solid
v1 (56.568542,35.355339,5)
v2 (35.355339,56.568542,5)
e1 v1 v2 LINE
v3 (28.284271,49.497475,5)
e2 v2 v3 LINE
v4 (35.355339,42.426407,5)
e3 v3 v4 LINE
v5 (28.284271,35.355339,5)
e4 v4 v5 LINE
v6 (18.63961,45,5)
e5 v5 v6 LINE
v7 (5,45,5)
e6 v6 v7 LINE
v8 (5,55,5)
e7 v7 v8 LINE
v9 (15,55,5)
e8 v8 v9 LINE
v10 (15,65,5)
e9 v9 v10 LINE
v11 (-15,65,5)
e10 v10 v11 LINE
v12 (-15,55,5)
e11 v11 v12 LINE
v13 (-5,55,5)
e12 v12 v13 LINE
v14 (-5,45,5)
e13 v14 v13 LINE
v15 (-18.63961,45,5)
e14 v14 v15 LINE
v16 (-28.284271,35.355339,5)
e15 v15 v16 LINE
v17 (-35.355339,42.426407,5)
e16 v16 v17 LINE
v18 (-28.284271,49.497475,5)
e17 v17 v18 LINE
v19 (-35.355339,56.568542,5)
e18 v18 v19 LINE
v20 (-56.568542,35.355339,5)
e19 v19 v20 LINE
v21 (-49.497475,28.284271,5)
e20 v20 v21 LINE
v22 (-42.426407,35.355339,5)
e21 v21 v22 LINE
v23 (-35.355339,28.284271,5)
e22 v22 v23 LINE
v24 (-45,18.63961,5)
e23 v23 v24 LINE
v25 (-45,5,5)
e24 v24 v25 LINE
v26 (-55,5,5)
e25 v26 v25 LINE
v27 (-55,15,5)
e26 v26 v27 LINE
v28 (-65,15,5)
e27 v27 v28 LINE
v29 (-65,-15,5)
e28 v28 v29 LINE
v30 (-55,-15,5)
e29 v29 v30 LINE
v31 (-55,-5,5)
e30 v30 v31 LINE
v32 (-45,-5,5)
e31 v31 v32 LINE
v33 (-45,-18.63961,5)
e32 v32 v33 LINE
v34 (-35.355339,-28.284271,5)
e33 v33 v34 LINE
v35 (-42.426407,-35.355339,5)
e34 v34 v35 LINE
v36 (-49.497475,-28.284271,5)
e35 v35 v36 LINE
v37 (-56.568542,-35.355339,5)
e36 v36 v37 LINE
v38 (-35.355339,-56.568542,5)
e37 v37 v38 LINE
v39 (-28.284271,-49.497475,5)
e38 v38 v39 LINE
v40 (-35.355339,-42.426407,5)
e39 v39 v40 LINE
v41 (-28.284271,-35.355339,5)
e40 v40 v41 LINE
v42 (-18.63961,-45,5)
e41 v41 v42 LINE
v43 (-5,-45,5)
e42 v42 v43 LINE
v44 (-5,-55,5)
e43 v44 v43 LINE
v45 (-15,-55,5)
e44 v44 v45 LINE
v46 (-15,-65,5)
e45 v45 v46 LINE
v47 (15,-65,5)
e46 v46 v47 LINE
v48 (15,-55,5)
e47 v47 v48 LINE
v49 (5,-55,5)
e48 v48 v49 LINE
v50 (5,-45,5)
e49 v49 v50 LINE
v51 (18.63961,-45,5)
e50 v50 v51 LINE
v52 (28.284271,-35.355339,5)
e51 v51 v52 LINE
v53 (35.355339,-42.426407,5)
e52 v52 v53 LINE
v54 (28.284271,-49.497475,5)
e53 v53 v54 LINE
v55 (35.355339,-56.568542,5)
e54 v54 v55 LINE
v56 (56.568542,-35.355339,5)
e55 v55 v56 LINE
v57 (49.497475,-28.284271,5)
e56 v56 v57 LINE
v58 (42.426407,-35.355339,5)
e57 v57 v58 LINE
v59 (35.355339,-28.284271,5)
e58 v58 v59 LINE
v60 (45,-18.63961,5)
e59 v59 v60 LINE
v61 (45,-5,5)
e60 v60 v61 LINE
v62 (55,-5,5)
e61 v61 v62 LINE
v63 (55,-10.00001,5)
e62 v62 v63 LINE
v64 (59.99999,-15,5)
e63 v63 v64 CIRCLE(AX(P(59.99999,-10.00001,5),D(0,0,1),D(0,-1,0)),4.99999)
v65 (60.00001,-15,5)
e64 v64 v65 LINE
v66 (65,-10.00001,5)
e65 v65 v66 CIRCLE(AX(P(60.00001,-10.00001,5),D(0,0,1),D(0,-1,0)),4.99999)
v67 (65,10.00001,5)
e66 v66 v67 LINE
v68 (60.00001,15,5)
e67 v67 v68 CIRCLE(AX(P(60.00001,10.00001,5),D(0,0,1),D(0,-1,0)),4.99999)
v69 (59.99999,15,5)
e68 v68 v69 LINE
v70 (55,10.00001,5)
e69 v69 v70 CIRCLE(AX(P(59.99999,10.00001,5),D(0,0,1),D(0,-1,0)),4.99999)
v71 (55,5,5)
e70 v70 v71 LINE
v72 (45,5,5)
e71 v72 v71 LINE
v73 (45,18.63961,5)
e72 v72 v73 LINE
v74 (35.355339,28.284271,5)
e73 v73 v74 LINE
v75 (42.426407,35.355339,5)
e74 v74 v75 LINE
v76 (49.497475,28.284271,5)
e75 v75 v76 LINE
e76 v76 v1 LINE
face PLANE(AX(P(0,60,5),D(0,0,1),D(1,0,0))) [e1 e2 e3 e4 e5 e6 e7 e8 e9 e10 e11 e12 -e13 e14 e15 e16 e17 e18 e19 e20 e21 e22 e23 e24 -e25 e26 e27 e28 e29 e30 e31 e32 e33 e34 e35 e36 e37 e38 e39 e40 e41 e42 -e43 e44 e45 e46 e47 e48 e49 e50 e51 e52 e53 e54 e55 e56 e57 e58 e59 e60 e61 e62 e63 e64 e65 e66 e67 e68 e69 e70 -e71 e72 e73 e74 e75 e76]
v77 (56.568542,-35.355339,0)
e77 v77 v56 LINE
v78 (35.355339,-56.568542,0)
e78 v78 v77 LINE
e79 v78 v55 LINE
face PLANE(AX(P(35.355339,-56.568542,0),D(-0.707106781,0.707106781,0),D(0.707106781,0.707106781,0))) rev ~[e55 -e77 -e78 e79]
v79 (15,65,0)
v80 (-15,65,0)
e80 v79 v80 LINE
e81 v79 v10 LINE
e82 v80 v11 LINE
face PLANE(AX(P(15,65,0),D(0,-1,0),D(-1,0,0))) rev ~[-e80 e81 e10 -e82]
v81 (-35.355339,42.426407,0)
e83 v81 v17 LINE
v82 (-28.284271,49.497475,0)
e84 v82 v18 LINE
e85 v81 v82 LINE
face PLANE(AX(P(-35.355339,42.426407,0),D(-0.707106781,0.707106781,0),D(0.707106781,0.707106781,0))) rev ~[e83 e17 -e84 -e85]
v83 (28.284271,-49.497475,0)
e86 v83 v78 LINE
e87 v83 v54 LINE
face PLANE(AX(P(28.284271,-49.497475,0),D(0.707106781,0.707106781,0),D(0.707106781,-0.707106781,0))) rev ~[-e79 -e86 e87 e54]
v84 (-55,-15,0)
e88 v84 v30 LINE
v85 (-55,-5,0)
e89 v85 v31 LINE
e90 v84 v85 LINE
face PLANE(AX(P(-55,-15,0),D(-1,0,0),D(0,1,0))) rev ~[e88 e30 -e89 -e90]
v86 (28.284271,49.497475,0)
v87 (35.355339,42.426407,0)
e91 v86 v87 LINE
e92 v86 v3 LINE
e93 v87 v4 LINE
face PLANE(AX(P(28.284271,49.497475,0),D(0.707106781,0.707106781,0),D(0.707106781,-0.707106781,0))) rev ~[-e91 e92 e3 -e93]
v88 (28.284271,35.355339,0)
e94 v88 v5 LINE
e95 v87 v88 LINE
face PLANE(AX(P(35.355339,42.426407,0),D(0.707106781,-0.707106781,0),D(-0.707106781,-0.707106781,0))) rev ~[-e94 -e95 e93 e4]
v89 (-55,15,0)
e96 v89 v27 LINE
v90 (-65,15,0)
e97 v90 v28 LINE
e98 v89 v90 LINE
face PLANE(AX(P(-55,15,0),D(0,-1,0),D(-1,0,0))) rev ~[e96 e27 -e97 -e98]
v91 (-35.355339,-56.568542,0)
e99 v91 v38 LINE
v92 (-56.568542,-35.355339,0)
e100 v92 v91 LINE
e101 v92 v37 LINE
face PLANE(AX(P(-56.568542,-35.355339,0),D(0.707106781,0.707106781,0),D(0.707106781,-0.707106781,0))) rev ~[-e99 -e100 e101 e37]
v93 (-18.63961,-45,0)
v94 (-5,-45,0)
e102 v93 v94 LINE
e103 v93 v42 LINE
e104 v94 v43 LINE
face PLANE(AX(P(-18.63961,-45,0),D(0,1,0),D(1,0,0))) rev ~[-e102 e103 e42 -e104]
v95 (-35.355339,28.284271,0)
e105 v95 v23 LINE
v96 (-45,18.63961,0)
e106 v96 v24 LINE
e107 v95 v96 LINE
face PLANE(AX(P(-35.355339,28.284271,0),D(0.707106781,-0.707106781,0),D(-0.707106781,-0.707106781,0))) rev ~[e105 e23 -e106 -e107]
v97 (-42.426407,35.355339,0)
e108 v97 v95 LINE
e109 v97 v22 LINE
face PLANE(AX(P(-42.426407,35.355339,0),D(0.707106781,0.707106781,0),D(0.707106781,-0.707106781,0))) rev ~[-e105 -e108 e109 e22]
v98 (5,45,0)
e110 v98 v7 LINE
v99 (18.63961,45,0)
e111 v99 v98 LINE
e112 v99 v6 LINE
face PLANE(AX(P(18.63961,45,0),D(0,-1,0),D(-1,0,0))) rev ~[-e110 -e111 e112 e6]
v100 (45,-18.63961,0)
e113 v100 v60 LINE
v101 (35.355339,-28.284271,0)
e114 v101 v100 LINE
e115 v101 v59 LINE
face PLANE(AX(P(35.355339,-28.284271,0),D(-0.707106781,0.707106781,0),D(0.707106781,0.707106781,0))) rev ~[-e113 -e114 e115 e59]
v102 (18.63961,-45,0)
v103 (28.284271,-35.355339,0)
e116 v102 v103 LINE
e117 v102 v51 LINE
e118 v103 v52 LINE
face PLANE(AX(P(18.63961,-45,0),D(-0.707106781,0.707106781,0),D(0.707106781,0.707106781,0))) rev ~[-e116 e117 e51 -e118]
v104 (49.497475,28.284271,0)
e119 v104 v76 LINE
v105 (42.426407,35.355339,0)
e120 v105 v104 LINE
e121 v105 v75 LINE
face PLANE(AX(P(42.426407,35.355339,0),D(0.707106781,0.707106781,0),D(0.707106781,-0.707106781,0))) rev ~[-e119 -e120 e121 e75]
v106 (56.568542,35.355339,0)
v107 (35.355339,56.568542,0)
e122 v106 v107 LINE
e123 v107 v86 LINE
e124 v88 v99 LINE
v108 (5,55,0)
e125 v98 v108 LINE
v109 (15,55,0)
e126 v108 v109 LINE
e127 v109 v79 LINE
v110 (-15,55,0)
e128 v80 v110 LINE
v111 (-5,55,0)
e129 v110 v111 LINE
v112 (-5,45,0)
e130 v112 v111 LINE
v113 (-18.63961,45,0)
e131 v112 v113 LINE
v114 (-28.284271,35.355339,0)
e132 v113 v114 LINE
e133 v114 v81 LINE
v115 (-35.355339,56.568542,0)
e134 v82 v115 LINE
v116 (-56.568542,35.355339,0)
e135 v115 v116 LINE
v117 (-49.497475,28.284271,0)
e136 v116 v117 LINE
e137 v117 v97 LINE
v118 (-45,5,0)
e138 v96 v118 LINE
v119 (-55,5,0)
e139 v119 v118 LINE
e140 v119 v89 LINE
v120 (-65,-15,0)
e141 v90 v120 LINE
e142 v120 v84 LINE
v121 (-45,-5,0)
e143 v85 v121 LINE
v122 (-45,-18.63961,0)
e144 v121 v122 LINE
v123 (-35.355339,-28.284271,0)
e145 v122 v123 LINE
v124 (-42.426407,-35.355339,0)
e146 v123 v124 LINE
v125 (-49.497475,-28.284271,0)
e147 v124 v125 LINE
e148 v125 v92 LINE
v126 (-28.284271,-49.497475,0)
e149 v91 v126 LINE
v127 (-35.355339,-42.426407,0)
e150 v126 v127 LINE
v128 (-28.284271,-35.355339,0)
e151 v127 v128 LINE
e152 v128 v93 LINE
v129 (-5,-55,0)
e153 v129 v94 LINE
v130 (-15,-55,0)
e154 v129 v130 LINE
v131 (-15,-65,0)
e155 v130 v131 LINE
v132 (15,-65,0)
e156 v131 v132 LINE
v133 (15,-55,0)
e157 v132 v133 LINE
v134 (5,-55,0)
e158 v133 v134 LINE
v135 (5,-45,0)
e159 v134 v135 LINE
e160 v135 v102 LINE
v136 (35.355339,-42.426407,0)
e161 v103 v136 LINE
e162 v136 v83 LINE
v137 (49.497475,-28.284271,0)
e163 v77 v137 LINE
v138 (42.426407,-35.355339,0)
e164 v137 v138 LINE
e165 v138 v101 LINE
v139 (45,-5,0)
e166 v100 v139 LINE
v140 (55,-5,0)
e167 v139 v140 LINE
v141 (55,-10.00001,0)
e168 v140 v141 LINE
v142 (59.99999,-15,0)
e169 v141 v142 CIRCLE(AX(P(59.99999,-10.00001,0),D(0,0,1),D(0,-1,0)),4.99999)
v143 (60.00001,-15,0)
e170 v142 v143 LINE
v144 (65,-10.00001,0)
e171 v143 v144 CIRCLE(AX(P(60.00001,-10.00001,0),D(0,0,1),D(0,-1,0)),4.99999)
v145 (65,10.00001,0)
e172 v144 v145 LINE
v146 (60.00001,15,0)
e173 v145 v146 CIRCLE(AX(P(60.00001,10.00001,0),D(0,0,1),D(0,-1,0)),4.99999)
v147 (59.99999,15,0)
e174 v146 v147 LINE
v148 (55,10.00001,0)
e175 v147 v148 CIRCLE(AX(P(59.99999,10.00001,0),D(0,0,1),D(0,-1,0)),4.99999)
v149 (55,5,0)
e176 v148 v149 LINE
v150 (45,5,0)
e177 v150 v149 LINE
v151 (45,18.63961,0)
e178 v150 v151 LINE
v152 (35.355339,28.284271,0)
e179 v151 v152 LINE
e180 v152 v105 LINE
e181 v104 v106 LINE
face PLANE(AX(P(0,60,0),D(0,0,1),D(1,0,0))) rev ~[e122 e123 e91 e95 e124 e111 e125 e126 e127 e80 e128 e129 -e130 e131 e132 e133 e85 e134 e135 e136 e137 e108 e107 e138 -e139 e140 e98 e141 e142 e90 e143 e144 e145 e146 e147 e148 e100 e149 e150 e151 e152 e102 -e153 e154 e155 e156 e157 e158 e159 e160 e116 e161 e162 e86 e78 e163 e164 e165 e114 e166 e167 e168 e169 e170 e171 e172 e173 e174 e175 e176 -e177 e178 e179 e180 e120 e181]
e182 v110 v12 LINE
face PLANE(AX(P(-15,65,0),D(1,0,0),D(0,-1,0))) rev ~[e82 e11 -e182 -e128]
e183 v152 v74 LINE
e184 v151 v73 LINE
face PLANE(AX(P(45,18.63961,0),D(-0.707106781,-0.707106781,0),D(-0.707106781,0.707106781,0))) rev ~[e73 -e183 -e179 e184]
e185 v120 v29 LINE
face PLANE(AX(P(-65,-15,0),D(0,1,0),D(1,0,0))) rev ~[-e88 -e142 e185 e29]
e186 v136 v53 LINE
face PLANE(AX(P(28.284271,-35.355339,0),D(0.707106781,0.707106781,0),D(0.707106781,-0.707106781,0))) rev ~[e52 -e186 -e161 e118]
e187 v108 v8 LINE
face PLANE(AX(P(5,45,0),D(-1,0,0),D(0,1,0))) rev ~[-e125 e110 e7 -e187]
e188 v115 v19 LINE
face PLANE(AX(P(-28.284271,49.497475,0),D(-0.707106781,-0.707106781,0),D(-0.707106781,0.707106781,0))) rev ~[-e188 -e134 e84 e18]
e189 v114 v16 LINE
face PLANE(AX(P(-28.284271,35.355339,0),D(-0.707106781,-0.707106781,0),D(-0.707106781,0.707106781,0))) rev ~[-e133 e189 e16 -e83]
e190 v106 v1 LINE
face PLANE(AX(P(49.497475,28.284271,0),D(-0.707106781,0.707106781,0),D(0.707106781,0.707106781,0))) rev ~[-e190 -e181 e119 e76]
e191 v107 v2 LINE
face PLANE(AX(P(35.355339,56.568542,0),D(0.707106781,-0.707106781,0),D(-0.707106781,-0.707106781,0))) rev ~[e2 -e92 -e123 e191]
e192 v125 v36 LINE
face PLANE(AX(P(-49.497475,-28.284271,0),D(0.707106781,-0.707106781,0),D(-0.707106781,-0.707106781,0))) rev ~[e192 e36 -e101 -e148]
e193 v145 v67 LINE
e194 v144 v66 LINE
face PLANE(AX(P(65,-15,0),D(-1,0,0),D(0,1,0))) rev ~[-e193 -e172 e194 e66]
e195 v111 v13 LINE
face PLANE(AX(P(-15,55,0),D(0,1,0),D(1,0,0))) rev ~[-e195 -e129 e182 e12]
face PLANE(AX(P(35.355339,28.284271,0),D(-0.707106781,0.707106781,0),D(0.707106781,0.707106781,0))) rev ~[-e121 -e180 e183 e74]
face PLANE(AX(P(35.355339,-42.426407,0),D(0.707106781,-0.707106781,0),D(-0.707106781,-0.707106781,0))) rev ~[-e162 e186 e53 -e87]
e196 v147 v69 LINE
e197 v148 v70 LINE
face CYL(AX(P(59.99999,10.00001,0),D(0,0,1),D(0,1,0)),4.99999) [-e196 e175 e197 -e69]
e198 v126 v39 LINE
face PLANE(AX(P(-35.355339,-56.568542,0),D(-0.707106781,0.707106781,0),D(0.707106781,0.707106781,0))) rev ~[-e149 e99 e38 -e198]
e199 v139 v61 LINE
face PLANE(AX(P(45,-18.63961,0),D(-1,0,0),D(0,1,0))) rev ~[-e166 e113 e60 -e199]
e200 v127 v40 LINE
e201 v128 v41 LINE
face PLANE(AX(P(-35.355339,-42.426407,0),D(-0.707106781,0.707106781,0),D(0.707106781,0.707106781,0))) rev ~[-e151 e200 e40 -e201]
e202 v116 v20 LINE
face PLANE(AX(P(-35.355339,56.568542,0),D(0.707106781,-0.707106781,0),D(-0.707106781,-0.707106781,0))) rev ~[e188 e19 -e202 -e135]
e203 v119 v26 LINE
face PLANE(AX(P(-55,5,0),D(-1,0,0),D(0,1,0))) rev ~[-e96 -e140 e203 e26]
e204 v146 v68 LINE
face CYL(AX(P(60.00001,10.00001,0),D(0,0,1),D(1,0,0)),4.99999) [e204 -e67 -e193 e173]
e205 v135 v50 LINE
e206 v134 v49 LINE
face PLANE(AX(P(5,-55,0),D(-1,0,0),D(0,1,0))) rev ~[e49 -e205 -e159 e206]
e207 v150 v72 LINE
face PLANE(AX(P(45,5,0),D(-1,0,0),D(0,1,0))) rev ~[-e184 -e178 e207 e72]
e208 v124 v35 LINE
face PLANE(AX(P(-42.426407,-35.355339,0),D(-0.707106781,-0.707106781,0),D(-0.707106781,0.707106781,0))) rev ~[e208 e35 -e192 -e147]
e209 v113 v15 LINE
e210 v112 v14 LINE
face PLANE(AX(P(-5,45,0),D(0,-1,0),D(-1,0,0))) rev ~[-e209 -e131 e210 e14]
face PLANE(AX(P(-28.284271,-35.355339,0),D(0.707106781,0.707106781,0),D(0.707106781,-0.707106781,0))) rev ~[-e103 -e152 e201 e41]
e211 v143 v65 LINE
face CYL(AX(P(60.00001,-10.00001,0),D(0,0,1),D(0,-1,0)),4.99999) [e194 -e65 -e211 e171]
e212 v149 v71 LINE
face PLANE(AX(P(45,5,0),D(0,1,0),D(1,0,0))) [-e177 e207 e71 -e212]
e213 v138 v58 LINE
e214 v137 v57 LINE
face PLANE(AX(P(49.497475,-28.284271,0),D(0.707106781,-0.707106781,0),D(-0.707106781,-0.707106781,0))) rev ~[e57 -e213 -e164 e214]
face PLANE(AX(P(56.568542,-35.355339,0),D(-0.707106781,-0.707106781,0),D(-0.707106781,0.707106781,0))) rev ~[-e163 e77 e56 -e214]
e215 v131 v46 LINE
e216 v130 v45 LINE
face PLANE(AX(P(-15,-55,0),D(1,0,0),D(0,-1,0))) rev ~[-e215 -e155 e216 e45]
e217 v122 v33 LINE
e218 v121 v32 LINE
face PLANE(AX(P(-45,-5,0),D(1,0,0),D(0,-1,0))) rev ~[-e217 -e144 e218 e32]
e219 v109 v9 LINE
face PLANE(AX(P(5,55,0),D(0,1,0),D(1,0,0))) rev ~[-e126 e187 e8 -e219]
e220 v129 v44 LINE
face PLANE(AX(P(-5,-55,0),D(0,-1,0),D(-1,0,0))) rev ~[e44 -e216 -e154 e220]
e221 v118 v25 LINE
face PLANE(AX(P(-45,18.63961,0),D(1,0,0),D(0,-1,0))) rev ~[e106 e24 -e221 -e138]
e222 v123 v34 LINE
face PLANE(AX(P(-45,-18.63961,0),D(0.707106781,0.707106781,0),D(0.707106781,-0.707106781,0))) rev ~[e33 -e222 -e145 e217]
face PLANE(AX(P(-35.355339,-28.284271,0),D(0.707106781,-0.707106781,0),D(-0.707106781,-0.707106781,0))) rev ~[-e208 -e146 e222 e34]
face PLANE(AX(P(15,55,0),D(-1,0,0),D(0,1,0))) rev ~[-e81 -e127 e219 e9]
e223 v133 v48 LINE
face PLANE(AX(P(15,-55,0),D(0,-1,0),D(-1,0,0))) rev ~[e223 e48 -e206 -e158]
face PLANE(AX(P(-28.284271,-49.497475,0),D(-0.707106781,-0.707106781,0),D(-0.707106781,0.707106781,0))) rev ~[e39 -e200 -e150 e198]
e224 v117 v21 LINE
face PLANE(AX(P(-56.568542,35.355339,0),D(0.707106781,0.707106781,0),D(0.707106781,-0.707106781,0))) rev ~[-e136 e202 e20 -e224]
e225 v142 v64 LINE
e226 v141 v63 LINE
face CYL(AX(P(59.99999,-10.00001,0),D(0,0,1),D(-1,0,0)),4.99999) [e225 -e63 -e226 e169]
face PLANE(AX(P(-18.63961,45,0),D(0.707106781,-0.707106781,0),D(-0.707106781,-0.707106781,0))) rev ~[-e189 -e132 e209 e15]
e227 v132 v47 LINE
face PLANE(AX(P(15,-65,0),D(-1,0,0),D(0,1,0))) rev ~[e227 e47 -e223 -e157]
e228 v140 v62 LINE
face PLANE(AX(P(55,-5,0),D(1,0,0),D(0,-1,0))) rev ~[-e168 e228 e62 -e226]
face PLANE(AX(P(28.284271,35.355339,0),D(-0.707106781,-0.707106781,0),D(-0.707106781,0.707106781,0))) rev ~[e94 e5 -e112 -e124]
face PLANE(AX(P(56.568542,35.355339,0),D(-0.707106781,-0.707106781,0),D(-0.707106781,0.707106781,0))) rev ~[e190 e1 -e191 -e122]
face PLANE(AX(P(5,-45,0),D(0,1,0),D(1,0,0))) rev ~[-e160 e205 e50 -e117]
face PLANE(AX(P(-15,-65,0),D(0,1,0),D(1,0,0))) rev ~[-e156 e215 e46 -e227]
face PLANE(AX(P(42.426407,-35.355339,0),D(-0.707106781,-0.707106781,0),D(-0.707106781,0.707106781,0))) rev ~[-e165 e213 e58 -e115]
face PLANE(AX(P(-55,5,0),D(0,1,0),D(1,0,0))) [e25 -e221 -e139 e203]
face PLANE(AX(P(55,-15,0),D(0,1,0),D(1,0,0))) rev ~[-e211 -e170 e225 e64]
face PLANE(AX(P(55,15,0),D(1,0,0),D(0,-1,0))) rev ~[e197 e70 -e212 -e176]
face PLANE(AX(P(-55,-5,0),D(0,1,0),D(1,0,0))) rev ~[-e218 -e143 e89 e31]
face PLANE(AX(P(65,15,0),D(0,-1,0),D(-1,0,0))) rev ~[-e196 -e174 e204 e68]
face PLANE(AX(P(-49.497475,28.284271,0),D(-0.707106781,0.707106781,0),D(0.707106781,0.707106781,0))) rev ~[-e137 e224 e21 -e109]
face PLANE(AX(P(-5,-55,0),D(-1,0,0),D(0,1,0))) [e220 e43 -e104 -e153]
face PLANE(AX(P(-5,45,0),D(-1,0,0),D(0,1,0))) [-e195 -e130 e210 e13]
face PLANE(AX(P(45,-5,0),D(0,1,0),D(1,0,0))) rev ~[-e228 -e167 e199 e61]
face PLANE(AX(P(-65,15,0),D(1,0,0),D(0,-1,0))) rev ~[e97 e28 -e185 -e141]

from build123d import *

# Parameters (mm, degrees)
F0_W     = 10
F0_H     = 10
F1_DEPTH = 5
F2_R     = 4.99999


# Not quite as in the source:
# - a fillet or chamfer is up to 0.001 mm smaller than in the source, because OpenCascade refuses the exact size
# - a feature names something its author has since deleted; it is built from what else it names


with BuildPart() as f1:
    # F0 (on Top) → F1 (new body)
    with BuildSketch(Plane.XY):
        Polygon((15, 65), (-15, 65), (-15, 55), (-5, 55), (5, 55), (15, 55), align=None)
        with Locations((0, 50)):
            Rectangle(F0_W, F0_H)
        Polygon((5, 45), (-5, 45), (-18.6396103068, 45), (18.6396103068, -45), (28.2842712475, -35.3553390593), (35.3553390593, -28.2842712475), (45, -18.6396103068), (45, -5), (45, 5), (45, 18.6396103068), (35.3553390593, 28.2842712475), (28.2842712475, 35.3553390593), (18.6396103068, 45), align=None)
        Polygon((18.6396103068, -45), (-18.6396103068, 45), (-28.2842712475, 35.3553390593), (-35.3553390593, 28.2842712475), (-45, 18.6396103068), (-45, 5), (-45, -5), (-45, -18.6396103068), (-35.3553390593, -28.2842712475), (-28.2842712475, -35.3553390593), (-18.6396103068, -45), (-5, -45), (5, -45), align=None)
        Polygon((-35.3553390593, 28.2842712475), (-28.2842712475, 35.3553390593), (-35.3553390593, 42.4264068712), (-42.4264068712, 35.3553390593), align=None)
        Polygon((35.3553390593, 42.4264068712), (28.2842712475, 35.3553390593), (35.3553390593, 28.2842712475), (42.4264068712, 35.3553390593), align=None)
        Polygon((-42.4264068712, 35.3553390593), (-35.3553390593, 42.4264068712), (-28.2842712475, 49.4974746831), (-35.3553390593, 56.5685424949), (-56.5685424949, 35.3553390593), (-49.4974746831, 28.2842712475), align=None)
        with Locations((0, -50)):
            Rectangle(F0_W, F0_H)
        Polygon((35.3553390593, -28.2842712475), (28.2842712475, -35.3553390593), (35.3553390593, -42.4264068712), (42.4264068712, -35.3553390593), align=None)
        Polygon((28.2842712475, 49.4974746831), (35.3553390593, 42.4264068712), (42.4264068712, 35.3553390593), (49.4974746831, 28.2842712475), (56.5685424949, 35.3553390593), (35.3553390593, 56.5685424949), align=None)
        Polygon((15, -55), (5, -55), (-5, -55), (-15, -55), (-15, -65), (15, -65), align=None)
        Polygon((42.4264068712, -35.3553390593), (35.3553390593, -42.4264068712), (28.2842712475, -49.4974746831), (35.3553390593, -56.5685424949), (56.5685424949, -35.3553390593), (49.4974746831, -28.2842712475), align=None)
        with Locations((-50, 0)):
            Rectangle(F0_W, F0_H)
        with Locations((50, 0)):
            Rectangle(F0_W, F0_H)
        Polygon((-55, -5), (-55, 5), (-55, 15), (-65, 15), (-65, -15), (-55, -15), align=None)
        Polygon((-35.3553390593, -42.4264068712), (-28.2842712475, -35.3553390593), (-35.3553390593, -28.2842712475), (-42.4264068712, -35.3553390593), align=None)
        Polygon((55, 15), (55, 5), (55, -5), (55, -15), (65, -15), (65, 15), align=None)
        Polygon((-28.2842712475, -49.4974746831), (-35.3553390593, -42.4264068712), (-42.4264068712, -35.3553390593), (-49.4974746831, -28.2842712475), (-56.5685424949, -35.3553390593), (-35.3553390593, -56.5685424949), align=None)
    extrude(amount=F1_DEPTH)

    # F2 (radius 5 in the source; OpenCascade refuses exactly that, so slightly less here)
    f2_edges = [f1.edges().sort_by_distance(p)[0] for p in [
        (65, 15, 2.5),
        (65, -15, 2.5),
        (55, 15, 2.5),
        (55, -15, 2.5),
    ]]
    fillet(f2_edges, radius=F2_R)


solid = f1.part
